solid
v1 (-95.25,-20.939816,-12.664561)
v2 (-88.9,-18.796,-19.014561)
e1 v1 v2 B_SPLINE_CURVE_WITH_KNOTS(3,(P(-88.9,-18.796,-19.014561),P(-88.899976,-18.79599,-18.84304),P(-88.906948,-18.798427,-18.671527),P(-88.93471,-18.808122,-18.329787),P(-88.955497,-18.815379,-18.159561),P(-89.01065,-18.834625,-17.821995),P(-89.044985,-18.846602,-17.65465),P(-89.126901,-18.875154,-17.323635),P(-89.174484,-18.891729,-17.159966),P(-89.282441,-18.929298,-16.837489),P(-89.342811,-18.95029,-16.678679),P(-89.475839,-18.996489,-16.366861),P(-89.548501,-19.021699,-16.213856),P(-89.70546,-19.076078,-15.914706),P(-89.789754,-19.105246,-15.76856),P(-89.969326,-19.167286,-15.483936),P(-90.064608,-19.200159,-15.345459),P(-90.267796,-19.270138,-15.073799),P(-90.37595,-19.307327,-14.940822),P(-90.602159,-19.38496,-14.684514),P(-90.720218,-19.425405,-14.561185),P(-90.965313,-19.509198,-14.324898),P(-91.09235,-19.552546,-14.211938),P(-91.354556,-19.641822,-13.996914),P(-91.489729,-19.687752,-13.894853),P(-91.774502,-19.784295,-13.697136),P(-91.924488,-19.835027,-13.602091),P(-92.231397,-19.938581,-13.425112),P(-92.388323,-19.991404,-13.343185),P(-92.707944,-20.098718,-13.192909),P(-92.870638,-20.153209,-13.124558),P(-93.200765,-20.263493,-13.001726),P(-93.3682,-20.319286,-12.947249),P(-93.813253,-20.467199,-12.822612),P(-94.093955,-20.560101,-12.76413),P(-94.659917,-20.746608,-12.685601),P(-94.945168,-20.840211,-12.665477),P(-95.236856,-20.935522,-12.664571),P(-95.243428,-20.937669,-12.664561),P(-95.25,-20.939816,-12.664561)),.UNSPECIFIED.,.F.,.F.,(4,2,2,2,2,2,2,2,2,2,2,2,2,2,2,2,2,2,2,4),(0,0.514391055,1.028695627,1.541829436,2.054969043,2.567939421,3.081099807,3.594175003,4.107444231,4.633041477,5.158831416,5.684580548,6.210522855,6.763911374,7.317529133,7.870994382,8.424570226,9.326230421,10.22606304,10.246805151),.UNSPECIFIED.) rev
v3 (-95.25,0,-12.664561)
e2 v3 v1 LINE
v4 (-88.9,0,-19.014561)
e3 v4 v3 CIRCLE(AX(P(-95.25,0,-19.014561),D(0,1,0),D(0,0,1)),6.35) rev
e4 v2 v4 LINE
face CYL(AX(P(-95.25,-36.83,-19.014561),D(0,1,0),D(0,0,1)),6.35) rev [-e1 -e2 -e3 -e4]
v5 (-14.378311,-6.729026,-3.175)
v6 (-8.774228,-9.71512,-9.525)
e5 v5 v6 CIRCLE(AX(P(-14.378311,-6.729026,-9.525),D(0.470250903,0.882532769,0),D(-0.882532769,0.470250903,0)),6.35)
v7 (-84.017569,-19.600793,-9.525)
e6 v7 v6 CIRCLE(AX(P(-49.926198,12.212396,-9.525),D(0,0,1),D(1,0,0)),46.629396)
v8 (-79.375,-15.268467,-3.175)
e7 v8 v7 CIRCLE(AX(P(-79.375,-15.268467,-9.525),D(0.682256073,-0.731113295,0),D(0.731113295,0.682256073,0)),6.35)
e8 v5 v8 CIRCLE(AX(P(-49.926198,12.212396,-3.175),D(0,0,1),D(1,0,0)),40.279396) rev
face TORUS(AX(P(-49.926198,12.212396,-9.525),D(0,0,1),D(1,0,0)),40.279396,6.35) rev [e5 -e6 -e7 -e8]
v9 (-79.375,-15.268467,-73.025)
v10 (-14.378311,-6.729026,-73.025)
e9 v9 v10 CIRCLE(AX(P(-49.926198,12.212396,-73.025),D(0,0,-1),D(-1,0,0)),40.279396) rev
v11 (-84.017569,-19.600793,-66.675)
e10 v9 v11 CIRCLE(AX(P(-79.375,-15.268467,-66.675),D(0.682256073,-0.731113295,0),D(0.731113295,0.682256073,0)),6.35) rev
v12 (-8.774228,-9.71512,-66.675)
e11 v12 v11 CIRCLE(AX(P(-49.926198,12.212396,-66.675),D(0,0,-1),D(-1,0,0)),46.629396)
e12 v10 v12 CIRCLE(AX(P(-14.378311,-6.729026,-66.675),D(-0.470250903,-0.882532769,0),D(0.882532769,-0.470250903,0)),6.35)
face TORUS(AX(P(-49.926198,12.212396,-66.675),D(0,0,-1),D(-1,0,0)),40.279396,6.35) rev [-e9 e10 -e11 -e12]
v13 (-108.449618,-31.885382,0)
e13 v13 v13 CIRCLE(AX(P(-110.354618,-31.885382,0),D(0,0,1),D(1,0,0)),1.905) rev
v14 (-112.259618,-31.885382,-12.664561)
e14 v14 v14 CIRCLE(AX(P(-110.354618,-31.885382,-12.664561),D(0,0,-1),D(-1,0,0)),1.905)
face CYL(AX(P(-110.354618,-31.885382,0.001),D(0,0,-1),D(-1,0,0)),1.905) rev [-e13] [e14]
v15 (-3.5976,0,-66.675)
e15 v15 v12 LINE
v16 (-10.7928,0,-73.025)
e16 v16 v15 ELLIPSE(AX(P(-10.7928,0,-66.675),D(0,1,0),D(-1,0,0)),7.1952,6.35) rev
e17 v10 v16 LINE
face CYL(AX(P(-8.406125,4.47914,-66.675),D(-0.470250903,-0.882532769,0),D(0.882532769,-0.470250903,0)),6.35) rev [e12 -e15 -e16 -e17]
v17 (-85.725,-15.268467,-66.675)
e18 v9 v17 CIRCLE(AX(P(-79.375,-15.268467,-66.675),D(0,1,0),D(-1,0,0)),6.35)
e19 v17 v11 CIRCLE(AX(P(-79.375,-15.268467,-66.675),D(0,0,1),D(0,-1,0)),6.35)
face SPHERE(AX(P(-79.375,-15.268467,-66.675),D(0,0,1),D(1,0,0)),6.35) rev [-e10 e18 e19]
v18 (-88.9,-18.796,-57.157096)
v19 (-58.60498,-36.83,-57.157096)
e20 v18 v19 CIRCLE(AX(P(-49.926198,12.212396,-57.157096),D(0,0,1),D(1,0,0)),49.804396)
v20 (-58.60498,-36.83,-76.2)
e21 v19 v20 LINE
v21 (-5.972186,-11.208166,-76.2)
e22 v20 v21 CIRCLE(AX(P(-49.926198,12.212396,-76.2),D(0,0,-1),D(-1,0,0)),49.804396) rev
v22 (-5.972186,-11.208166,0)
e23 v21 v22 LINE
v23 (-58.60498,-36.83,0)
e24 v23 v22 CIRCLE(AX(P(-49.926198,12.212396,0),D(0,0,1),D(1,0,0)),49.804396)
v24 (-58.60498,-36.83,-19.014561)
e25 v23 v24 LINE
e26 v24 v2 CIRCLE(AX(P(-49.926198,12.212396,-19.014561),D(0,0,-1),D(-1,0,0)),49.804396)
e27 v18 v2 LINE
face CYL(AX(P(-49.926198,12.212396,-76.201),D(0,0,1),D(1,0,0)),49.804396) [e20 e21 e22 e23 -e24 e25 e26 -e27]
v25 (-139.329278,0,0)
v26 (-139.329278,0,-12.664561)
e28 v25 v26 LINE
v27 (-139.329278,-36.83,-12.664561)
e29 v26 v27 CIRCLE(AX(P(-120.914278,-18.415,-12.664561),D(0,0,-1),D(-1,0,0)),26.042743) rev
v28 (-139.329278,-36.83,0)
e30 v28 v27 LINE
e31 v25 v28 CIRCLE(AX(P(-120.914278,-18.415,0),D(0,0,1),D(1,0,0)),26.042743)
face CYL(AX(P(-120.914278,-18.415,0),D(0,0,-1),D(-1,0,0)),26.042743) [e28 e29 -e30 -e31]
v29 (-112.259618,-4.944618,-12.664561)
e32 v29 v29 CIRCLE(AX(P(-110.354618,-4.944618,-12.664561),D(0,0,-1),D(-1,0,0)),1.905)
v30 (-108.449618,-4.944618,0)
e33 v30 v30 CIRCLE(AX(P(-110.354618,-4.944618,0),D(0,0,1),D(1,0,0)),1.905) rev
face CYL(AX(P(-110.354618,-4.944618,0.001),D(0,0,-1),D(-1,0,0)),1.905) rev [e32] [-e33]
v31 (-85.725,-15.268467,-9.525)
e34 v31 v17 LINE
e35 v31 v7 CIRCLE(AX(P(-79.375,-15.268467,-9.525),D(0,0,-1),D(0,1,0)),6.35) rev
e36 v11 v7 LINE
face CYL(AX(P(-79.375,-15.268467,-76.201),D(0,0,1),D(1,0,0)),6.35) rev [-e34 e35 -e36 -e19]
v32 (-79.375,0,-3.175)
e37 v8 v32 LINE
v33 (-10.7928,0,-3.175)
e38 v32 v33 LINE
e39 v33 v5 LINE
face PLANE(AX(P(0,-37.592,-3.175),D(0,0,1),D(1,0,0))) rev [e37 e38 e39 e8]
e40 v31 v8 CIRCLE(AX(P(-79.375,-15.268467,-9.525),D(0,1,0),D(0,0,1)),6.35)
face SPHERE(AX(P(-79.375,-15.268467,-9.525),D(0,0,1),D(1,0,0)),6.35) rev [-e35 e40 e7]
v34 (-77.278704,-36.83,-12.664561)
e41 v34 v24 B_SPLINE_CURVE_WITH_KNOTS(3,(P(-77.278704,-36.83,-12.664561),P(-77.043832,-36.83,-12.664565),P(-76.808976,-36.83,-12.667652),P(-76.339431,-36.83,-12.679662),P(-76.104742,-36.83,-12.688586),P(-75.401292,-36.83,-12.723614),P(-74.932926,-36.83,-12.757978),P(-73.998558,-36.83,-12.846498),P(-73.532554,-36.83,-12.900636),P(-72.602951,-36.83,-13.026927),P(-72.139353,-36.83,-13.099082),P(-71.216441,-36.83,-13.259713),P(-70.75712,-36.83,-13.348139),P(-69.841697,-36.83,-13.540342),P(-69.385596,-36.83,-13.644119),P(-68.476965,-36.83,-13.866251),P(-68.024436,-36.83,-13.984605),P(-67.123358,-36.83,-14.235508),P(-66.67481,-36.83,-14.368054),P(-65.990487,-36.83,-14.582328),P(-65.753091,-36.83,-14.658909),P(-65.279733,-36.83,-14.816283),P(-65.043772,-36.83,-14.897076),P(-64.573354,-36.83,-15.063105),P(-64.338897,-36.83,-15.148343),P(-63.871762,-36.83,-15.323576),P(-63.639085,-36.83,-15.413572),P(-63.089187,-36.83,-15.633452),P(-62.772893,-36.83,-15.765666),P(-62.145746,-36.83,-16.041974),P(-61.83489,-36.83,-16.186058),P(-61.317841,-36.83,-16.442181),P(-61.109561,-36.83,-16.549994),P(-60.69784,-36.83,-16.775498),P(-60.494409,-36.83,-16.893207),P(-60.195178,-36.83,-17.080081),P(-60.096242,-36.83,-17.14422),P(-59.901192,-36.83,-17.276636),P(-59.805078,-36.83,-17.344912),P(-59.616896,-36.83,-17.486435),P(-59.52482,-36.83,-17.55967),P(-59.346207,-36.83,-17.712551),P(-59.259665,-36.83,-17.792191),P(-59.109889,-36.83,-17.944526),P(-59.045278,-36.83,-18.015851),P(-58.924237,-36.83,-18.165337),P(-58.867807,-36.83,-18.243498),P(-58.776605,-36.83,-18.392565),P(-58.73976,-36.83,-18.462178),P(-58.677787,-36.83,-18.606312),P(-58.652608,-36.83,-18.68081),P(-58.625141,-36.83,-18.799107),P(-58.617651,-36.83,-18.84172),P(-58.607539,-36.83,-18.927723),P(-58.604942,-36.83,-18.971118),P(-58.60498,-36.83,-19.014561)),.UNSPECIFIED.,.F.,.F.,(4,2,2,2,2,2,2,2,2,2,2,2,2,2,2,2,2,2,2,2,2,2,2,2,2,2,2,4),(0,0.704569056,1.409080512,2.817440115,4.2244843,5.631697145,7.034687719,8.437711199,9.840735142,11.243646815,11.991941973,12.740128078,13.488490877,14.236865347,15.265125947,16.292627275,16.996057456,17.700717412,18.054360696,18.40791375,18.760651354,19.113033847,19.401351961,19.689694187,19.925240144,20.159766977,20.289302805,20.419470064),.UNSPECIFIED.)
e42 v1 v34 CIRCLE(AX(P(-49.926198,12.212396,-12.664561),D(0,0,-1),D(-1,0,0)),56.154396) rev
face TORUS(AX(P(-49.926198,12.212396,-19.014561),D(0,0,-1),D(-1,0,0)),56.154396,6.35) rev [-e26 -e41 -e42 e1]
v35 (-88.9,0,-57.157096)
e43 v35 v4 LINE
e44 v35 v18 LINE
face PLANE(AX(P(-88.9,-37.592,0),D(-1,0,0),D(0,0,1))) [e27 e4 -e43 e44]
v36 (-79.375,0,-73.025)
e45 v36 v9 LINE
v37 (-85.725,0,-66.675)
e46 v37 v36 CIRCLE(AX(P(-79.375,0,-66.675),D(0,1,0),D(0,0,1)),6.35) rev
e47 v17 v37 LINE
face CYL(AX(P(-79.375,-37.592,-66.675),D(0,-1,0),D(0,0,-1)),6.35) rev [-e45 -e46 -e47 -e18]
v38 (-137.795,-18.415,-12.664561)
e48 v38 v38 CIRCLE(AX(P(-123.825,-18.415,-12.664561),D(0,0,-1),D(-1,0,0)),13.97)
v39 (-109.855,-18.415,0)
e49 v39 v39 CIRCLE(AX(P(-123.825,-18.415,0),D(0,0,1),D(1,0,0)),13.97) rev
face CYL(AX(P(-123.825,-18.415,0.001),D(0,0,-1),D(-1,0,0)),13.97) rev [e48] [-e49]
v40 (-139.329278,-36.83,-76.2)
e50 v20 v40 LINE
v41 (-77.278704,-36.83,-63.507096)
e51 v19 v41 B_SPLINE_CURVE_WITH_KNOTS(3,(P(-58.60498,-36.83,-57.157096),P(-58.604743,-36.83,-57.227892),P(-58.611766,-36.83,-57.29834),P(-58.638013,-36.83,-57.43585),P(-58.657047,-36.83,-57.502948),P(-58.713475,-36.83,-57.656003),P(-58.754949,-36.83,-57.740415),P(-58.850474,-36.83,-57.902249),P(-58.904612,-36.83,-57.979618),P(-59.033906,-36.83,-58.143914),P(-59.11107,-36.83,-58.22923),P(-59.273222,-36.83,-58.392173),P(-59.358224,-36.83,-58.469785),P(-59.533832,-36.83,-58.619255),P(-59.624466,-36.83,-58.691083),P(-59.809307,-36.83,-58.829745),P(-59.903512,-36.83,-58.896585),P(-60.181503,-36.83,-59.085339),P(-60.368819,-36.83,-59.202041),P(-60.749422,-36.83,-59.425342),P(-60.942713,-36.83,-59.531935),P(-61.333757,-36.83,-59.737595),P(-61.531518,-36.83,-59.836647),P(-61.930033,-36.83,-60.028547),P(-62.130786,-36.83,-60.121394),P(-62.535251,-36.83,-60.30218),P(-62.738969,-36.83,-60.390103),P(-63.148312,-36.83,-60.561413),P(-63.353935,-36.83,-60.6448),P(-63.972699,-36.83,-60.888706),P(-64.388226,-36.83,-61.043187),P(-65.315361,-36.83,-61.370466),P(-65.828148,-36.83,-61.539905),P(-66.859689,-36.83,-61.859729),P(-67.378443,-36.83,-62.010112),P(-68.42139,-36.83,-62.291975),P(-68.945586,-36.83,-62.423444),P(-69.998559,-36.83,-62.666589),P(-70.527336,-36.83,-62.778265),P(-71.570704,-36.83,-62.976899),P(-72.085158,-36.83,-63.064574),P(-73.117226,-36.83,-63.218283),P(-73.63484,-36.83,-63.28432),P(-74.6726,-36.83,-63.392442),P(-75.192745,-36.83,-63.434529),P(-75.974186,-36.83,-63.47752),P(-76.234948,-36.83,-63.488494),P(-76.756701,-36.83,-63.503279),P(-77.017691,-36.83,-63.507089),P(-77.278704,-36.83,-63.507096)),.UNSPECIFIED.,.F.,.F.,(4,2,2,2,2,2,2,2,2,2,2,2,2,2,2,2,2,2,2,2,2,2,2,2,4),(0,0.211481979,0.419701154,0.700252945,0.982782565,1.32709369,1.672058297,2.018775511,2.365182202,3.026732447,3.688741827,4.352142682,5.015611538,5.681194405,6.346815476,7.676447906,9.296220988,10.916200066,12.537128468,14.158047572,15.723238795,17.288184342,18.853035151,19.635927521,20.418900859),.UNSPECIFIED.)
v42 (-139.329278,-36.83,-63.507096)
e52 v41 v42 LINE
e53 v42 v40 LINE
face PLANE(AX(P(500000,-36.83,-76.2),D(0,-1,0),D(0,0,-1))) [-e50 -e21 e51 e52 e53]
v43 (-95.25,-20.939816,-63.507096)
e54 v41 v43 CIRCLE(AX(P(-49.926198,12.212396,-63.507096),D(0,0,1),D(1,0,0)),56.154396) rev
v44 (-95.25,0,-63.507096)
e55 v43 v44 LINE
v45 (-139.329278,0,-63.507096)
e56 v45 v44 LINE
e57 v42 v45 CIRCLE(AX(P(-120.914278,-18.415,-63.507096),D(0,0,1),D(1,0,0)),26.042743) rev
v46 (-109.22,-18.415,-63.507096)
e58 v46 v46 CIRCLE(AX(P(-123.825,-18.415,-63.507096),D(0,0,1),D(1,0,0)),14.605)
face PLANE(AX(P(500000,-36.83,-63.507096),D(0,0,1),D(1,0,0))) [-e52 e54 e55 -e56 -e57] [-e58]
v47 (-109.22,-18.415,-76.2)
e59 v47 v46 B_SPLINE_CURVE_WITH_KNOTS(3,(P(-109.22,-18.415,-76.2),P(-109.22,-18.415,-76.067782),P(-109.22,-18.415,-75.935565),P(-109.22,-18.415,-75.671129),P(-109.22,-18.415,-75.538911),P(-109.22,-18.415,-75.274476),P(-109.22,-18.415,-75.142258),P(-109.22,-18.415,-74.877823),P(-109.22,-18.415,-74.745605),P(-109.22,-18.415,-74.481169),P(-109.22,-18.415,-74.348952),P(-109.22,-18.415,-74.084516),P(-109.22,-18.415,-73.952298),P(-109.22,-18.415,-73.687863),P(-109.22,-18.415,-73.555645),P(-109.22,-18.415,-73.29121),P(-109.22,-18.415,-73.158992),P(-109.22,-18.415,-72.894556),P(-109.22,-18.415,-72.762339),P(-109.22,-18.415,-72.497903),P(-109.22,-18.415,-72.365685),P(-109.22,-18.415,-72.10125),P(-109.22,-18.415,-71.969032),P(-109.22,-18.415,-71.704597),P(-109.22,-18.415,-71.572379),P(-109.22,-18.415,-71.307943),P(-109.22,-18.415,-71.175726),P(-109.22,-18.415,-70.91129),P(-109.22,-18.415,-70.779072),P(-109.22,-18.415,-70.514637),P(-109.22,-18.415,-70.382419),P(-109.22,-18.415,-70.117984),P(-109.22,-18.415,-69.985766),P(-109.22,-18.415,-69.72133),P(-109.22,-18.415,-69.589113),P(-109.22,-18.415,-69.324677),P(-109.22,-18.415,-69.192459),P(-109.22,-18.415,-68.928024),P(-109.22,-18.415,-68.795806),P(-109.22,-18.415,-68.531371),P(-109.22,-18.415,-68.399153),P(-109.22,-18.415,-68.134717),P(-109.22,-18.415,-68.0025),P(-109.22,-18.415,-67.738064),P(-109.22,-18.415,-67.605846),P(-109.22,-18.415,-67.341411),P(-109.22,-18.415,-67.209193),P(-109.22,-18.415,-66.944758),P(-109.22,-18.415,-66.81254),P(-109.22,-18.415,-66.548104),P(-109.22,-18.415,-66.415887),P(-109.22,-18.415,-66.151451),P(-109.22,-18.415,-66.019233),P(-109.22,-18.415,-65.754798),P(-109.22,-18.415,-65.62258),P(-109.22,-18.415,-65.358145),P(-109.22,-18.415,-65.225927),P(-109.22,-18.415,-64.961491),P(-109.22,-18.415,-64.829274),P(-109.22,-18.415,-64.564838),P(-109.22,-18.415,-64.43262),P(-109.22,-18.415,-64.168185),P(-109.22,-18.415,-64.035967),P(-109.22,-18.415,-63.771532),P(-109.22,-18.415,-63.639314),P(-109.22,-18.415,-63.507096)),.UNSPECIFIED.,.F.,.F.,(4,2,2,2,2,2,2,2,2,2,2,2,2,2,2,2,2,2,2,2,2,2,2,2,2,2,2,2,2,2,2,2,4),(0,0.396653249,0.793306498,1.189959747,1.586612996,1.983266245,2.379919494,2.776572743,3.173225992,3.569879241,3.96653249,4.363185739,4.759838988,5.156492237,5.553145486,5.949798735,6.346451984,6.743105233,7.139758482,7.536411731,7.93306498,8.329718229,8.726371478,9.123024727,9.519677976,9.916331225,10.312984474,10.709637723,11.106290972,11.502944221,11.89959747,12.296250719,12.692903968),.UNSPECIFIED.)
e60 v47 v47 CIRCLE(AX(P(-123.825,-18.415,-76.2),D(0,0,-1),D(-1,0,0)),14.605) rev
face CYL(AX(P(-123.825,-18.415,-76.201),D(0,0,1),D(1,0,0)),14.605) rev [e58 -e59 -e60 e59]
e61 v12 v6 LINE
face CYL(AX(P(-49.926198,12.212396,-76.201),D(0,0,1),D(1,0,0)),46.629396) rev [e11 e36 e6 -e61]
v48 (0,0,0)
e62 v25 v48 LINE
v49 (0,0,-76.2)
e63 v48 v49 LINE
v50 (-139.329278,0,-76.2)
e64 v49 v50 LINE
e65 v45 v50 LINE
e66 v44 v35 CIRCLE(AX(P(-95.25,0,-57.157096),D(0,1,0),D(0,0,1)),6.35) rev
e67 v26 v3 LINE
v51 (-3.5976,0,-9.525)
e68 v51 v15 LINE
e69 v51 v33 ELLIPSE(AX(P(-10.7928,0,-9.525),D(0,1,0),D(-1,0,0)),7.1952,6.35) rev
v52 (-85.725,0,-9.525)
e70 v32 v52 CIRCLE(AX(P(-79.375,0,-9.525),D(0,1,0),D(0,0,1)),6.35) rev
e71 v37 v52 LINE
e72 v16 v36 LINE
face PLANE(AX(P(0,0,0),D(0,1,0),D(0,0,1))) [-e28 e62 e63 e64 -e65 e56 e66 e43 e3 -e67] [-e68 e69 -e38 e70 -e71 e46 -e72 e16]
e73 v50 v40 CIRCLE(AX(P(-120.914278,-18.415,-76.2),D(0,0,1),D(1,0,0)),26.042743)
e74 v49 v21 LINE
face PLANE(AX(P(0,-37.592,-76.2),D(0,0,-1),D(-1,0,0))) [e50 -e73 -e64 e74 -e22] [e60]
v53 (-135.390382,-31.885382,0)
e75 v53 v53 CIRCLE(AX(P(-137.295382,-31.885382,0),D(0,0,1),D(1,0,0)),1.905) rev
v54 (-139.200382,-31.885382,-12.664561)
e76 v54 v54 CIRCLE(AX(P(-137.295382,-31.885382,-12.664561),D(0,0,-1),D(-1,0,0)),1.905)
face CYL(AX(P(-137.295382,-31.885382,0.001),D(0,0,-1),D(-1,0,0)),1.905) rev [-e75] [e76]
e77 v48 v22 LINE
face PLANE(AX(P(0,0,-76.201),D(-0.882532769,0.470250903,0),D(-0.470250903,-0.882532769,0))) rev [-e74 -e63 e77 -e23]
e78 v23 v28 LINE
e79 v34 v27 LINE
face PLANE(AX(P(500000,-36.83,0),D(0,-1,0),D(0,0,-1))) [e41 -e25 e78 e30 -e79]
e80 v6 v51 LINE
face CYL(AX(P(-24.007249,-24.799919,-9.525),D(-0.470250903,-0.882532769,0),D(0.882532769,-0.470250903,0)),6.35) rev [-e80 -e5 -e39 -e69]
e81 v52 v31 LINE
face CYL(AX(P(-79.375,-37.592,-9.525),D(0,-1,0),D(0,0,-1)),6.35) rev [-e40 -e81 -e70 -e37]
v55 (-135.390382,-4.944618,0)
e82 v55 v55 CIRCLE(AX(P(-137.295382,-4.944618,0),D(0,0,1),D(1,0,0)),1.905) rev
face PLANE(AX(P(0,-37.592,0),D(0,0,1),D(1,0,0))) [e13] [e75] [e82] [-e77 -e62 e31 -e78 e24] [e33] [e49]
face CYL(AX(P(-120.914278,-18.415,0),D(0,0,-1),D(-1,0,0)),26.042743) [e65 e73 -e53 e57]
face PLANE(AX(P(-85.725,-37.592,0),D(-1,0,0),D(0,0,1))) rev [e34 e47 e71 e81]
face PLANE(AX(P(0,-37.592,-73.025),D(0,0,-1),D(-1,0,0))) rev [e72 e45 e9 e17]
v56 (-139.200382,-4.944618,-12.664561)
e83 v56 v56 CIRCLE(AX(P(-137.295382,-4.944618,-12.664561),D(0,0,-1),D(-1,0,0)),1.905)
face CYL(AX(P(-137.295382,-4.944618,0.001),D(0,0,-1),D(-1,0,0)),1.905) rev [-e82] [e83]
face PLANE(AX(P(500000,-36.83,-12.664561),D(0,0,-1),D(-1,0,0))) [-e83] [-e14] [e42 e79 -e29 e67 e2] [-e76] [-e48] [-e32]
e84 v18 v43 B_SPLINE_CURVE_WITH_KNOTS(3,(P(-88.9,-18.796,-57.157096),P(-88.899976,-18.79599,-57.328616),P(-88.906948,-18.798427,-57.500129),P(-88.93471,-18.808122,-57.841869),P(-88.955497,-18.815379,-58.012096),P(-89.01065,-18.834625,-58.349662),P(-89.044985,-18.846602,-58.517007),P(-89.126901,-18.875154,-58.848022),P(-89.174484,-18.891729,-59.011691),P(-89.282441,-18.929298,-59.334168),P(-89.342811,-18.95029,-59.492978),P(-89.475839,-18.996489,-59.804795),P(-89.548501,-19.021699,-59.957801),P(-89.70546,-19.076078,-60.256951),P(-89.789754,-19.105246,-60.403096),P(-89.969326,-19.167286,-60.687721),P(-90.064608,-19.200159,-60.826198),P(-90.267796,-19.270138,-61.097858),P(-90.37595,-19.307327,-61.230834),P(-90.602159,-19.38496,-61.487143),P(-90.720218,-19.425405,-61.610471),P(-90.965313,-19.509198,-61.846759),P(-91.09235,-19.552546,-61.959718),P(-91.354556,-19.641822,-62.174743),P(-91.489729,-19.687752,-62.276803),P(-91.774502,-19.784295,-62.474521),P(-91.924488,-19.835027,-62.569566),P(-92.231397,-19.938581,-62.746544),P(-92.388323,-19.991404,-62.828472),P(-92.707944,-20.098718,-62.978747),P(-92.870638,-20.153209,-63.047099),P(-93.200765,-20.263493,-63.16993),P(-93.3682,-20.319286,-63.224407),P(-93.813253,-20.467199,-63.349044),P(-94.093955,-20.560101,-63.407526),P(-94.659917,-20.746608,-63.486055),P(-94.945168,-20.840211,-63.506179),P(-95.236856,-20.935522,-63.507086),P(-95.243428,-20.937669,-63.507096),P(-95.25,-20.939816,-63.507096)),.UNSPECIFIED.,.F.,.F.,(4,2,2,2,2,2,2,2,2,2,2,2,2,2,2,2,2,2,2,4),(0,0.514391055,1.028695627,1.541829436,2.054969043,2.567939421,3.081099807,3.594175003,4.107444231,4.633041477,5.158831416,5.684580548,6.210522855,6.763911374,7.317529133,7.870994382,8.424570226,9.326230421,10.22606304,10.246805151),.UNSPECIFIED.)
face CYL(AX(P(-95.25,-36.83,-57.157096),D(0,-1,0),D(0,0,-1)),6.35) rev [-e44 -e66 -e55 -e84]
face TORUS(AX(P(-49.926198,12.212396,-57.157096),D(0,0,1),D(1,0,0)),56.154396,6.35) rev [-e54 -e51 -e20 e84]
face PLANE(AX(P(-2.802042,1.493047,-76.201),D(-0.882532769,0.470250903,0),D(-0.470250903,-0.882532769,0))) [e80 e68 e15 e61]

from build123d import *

# Parameters (mm, degrees)
SKETCH1_W                       = 88.9
SKETCH1_H                       = 76.2
BOSS_EXTRUDE1_DEPTH             = 37.592
CUT_EXTRUDE1_REACH              = 124.975
SHELL1_T                        = -3.175
SKETCH16_W                      = 12.664560545
SKETCH16_H                      = 36.83
SKETCH16_W_2                    = 12.692903968
BOSS_EXTRUDE4_DEPTH             = 63.5
BOSS_EXTRUDE4_DIRECTION_2_REACH = 124.975
CUT_EXTRUDE2_REACH              = 171.328
SKETCH18_R                      = 14.605
CUT_EXTRUDE3_REACH              = 171.339
SKETCH20_R                      = 13.97
SKETCH20_R_2                    = 1.905
CUT_EXTRUDE4_DEPTH              = 175.485983575
FILLET2_R                       = 6.35


with BuildPart() as part:
    # Sketch1 → Boss-Extrude1 (new body)
    with BuildSketch(Plane(origin=(0, 0, 0), x_dir=(1, 0, 0), z_dir=(0, 1, 0))):
        with Locations((-44.45, 38.1)):
            Rectangle(SKETCH1_W, SKETCH1_H)
    extrude(amount=-BOSS_EXTRUDE1_DEPTH)

    # Sketch2 → Cut-Extrude1 (cut, up to next)
    with BuildSketch(Plane.XY, mode=Mode.PRIVATE) as cut_extrude1_sk1:
        with BuildLine():
            ThreePointArc((-49.926198023, -37.592), (-71.560931997, -32.647565517), (-88.9, -18.796))
            Line((-88.9, -18.796), (-88.9, -37.592))
            Line((-88.9, -37.592), (-49.926198023, -37.592))
        make_face()
    cut_extrude1_tool1 = extrude(cut_extrude1_sk1.sketch, amount=-CUT_EXTRUDE1_REACH, mode=Mode.PRIVATE) & part.part
    # Sketch2 → Cut-Extrude1 (cut, up to next)
    with BuildSketch(Plane.XY, mode=Mode.PRIVATE) as cut_extrude1_sk2:
        with BuildLine():
            Line((0, -37.592), (0, 0))
            Line((0, 0), (-5.972186469, -11.208166165))
            ThreePointArc((-5.972186469, -11.208166165), (-24.293885313, -30.489622768), (-49.926198023, -37.592))
            Line((-49.926198023, -37.592), (0, -37.592))
        make_face()
    cut_extrude1_tool2 = extrude(cut_extrude1_sk2.sketch, amount=-CUT_EXTRUDE1_REACH, mode=Mode.PRIVATE) & part.part
    add(cut_extrude1_tool1.solids().sort_by_distance((-79.562366, -32.198077, 0))[0], mode=Mode.SUBTRACT)
    add(cut_extrude1_tool2.solids().sort_by_distance((-11.384711, -27.029682, 0))[0], mode=Mode.SUBTRACT)

    # Shell1
    shell1_openings = [part.faces().sort_by_distance(p)[0] for p in [
        (-44.45, 0, -38.1),
    ]]
    offset(amount=SHELL1_T, openings=shell1_openings, kind=Kind.INTERSECTION)

    # Sketch16 → Boss-Extrude4 (add)
    with BuildSketch(Plane.ZY.offset(88.9)):
        with Locations((-6.332280273, -18.415)):
            Rectangle(SKETCH16_W, SKETCH16_H)
        with Locations((-69.853548016, -18.415)):
            Rectangle(SKETCH16_W_2, SKETCH16_H)
    extrude(amount=BOSS_EXTRUDE4_DEPTH)

    # Sketch16 → Boss-Extrude4 direction 2 (add, up to next)
    with BuildSketch(Plane.ZY.offset(88.9), mode=Mode.PRIVATE) as boss_extrude4_direction_2_sk1:
        with Locations((-6.332280273, -18.415)):
            Rectangle(SKETCH16_W, SKETCH16_H)
    boss_extrude4_direction_2_tool1 = extrude(boss_extrude4_direction_2_sk1.sketch, amount=-BOSS_EXTRUDE4_DIRECTION_2_REACH, mode=Mode.PRIVATE) - part.part
    # Sketch16 → Boss-Extrude4 direction 2 (add, up to next)
    with BuildSketch(Plane.ZY.offset(88.9), mode=Mode.PRIVATE) as boss_extrude4_direction_2_sk2:
        with Locations((-69.853548016, -18.415)):
            Rectangle(SKETCH16_W_2, SKETCH16_H)
    boss_extrude4_direction_2_tool2 = extrude(boss_extrude4_direction_2_sk2.sketch, amount=-BOSS_EXTRUDE4_DIRECTION_2_REACH, mode=Mode.PRIVATE) - part.part
    add(boss_extrude4_direction_2_tool1.solids().sort_by_distance((-88.9, -18.415, -6.33228))[0])
    add(boss_extrude4_direction_2_tool2.solids().sort_by_distance((-88.9, -18.415, -69.853548))[0])

    # Sketch18 → Cut-Extrude2 (cut, up to next)
    with BuildSketch(Plane.XY.offset(-63.507096032), mode=Mode.PRIVATE) as cut_extrude2_sk1:
        with Locations((-123.825, -18.415)):
            Circle(SKETCH18_R)
    cut_extrude2_tool1 = extrude(cut_extrude2_sk1.sketch, amount=-CUT_EXTRUDE2_REACH, mode=Mode.PRIVATE) & part.part
    add(cut_extrude2_tool1.solids().sort_by_distance((-123.825, -18.415, -63.507096))[0], mode=Mode.SUBTRACT)

    # Sketch20 → Cut-Extrude3 (cut, up to next)
    with BuildSketch(Plane(origin=(0, 0, -12.664560545), x_dir=(-1, 0, 0), z_dir=(0, 0, -1)), mode=Mode.PRIVATE) as cut_extrude3_sk1:
        with Locations((123.825, -18.415)):
            Circle(SKETCH20_R)
    cut_extrude3_tool1 = extrude(cut_extrude3_sk1.sketch, amount=-CUT_EXTRUDE3_REACH, mode=Mode.PRIVATE) & part.part
    # Sketch20 → Cut-Extrude3 (cut, up to next)
    with BuildSketch(Plane(origin=(0, 0, -12.664560545), x_dir=(-1, 0, 0), z_dir=(0, 0, -1)), mode=Mode.PRIVATE) as cut_extrude3_sk2:
        with Locations((137.295382, -4.944618)):
            Circle(SKETCH20_R_2)
    cut_extrude3_tool2 = extrude(cut_extrude3_sk2.sketch, amount=-CUT_EXTRUDE3_REACH, mode=Mode.PRIVATE) & part.part
    # Sketch20 → Cut-Extrude3 (cut, up to next)
    with BuildSketch(Plane(origin=(0, 0, -12.664560545), x_dir=(-1, 0, 0), z_dir=(0, 0, -1)), mode=Mode.PRIVATE) as cut_extrude3_sk3:
        with Locations((137.295382, -31.885382)):
            Circle(SKETCH20_R_2)
    cut_extrude3_tool3 = extrude(cut_extrude3_sk3.sketch, amount=-CUT_EXTRUDE3_REACH, mode=Mode.PRIVATE) & part.part
    # Sketch20 → Cut-Extrude3 (cut, up to next)
    with BuildSketch(Plane(origin=(0, 0, -12.664560545), x_dir=(-1, 0, 0), z_dir=(0, 0, -1)), mode=Mode.PRIVATE) as cut_extrude3_sk4:
        with Locations((110.354618, -31.885382)):
            Circle(SKETCH20_R_2)
    cut_extrude3_tool4 = extrude(cut_extrude3_sk4.sketch, amount=-CUT_EXTRUDE3_REACH, mode=Mode.PRIVATE) & part.part
    # Sketch20 → Cut-Extrude3 (cut, up to next)
    with BuildSketch(Plane(origin=(0, 0, -12.664560545), x_dir=(-1, 0, 0), z_dir=(0, 0, -1)), mode=Mode.PRIVATE) as cut_extrude3_sk5:
        with Locations((110.354618, -4.944618)):
            Circle(SKETCH20_R_2)
    cut_extrude3_tool5 = extrude(cut_extrude3_sk5.sketch, amount=-CUT_EXTRUDE3_REACH, mode=Mode.PRIVATE) & part.part
    add(cut_extrude3_tool1.solids().sort_by_distance((-123.825, -18.415, -12.664561))[0], mode=Mode.SUBTRACT)
    add(cut_extrude3_tool2.solids().sort_by_distance((-137.295382, -4.944618, -12.664561))[0], mode=Mode.SUBTRACT)
    add(cut_extrude3_tool3.solids().sort_by_distance((-137.295382, -31.885382, -12.664561))[0], mode=Mode.SUBTRACT)
    add(cut_extrude3_tool4.solids().sort_by_distance((-110.354618, -31.885382, -12.664561))[0], mode=Mode.SUBTRACT)
    add(cut_extrude3_tool5.solids().sort_by_distance((-110.354618, -4.944618, -12.664561))[0], mode=Mode.SUBTRACT)

    # Sketch22 → Cut-Extrude4 (cut, through all)
    with BuildSketch(Plane(origin=(0, 0, -76.2), x_dir=(-1, 0, 0), z_dir=(0, 0, -1))):
        with BuildLine():
            Line((139.329278278, 0), (152.4, 0))
            Line((152.4, 0), (152.4, -36.83))
            Line((152.4, -36.83), (139.329278278, -36.83))
            ThreePointArc((139.329278278, -36.83), (146.957021029, -18.415), (139.329278278, 0))
        make_face()
    extrude(amount=-CUT_EXTRUDE4_DEPTH, mode=Mode.SUBTRACT)

    # Fillet2
    fillet2_edges = [part.edges().sort_by_distance(p)[0] for p in [
        (-75.401646537, -30.583390997, -63.507096032),
        (-75.401646537, -30.583390997, -12.664560545),
        (-88.9, -9.398, -63.507096032),
        (-88.9, -9.398, -12.664560545),
        (-6.185914068, -4.857559774, -73.025),
        (-6.185914068, -4.857559774, -3.175),
        (-85.725, -8.83323263, -73.025),
        (-45.133487238, -34.170041352, -73.025),
        (-85.725, -17.66646526, -38.1),
        (-85.725, -8.83323263, -3.175),
        (-45.133487238, -34.170041352, -3.175),
    ]]
    fillet(fillet2_edges, radius=FILLET2_R - 0.0001)  # a hair under: the kernel refuses the full size


solid = part.part
